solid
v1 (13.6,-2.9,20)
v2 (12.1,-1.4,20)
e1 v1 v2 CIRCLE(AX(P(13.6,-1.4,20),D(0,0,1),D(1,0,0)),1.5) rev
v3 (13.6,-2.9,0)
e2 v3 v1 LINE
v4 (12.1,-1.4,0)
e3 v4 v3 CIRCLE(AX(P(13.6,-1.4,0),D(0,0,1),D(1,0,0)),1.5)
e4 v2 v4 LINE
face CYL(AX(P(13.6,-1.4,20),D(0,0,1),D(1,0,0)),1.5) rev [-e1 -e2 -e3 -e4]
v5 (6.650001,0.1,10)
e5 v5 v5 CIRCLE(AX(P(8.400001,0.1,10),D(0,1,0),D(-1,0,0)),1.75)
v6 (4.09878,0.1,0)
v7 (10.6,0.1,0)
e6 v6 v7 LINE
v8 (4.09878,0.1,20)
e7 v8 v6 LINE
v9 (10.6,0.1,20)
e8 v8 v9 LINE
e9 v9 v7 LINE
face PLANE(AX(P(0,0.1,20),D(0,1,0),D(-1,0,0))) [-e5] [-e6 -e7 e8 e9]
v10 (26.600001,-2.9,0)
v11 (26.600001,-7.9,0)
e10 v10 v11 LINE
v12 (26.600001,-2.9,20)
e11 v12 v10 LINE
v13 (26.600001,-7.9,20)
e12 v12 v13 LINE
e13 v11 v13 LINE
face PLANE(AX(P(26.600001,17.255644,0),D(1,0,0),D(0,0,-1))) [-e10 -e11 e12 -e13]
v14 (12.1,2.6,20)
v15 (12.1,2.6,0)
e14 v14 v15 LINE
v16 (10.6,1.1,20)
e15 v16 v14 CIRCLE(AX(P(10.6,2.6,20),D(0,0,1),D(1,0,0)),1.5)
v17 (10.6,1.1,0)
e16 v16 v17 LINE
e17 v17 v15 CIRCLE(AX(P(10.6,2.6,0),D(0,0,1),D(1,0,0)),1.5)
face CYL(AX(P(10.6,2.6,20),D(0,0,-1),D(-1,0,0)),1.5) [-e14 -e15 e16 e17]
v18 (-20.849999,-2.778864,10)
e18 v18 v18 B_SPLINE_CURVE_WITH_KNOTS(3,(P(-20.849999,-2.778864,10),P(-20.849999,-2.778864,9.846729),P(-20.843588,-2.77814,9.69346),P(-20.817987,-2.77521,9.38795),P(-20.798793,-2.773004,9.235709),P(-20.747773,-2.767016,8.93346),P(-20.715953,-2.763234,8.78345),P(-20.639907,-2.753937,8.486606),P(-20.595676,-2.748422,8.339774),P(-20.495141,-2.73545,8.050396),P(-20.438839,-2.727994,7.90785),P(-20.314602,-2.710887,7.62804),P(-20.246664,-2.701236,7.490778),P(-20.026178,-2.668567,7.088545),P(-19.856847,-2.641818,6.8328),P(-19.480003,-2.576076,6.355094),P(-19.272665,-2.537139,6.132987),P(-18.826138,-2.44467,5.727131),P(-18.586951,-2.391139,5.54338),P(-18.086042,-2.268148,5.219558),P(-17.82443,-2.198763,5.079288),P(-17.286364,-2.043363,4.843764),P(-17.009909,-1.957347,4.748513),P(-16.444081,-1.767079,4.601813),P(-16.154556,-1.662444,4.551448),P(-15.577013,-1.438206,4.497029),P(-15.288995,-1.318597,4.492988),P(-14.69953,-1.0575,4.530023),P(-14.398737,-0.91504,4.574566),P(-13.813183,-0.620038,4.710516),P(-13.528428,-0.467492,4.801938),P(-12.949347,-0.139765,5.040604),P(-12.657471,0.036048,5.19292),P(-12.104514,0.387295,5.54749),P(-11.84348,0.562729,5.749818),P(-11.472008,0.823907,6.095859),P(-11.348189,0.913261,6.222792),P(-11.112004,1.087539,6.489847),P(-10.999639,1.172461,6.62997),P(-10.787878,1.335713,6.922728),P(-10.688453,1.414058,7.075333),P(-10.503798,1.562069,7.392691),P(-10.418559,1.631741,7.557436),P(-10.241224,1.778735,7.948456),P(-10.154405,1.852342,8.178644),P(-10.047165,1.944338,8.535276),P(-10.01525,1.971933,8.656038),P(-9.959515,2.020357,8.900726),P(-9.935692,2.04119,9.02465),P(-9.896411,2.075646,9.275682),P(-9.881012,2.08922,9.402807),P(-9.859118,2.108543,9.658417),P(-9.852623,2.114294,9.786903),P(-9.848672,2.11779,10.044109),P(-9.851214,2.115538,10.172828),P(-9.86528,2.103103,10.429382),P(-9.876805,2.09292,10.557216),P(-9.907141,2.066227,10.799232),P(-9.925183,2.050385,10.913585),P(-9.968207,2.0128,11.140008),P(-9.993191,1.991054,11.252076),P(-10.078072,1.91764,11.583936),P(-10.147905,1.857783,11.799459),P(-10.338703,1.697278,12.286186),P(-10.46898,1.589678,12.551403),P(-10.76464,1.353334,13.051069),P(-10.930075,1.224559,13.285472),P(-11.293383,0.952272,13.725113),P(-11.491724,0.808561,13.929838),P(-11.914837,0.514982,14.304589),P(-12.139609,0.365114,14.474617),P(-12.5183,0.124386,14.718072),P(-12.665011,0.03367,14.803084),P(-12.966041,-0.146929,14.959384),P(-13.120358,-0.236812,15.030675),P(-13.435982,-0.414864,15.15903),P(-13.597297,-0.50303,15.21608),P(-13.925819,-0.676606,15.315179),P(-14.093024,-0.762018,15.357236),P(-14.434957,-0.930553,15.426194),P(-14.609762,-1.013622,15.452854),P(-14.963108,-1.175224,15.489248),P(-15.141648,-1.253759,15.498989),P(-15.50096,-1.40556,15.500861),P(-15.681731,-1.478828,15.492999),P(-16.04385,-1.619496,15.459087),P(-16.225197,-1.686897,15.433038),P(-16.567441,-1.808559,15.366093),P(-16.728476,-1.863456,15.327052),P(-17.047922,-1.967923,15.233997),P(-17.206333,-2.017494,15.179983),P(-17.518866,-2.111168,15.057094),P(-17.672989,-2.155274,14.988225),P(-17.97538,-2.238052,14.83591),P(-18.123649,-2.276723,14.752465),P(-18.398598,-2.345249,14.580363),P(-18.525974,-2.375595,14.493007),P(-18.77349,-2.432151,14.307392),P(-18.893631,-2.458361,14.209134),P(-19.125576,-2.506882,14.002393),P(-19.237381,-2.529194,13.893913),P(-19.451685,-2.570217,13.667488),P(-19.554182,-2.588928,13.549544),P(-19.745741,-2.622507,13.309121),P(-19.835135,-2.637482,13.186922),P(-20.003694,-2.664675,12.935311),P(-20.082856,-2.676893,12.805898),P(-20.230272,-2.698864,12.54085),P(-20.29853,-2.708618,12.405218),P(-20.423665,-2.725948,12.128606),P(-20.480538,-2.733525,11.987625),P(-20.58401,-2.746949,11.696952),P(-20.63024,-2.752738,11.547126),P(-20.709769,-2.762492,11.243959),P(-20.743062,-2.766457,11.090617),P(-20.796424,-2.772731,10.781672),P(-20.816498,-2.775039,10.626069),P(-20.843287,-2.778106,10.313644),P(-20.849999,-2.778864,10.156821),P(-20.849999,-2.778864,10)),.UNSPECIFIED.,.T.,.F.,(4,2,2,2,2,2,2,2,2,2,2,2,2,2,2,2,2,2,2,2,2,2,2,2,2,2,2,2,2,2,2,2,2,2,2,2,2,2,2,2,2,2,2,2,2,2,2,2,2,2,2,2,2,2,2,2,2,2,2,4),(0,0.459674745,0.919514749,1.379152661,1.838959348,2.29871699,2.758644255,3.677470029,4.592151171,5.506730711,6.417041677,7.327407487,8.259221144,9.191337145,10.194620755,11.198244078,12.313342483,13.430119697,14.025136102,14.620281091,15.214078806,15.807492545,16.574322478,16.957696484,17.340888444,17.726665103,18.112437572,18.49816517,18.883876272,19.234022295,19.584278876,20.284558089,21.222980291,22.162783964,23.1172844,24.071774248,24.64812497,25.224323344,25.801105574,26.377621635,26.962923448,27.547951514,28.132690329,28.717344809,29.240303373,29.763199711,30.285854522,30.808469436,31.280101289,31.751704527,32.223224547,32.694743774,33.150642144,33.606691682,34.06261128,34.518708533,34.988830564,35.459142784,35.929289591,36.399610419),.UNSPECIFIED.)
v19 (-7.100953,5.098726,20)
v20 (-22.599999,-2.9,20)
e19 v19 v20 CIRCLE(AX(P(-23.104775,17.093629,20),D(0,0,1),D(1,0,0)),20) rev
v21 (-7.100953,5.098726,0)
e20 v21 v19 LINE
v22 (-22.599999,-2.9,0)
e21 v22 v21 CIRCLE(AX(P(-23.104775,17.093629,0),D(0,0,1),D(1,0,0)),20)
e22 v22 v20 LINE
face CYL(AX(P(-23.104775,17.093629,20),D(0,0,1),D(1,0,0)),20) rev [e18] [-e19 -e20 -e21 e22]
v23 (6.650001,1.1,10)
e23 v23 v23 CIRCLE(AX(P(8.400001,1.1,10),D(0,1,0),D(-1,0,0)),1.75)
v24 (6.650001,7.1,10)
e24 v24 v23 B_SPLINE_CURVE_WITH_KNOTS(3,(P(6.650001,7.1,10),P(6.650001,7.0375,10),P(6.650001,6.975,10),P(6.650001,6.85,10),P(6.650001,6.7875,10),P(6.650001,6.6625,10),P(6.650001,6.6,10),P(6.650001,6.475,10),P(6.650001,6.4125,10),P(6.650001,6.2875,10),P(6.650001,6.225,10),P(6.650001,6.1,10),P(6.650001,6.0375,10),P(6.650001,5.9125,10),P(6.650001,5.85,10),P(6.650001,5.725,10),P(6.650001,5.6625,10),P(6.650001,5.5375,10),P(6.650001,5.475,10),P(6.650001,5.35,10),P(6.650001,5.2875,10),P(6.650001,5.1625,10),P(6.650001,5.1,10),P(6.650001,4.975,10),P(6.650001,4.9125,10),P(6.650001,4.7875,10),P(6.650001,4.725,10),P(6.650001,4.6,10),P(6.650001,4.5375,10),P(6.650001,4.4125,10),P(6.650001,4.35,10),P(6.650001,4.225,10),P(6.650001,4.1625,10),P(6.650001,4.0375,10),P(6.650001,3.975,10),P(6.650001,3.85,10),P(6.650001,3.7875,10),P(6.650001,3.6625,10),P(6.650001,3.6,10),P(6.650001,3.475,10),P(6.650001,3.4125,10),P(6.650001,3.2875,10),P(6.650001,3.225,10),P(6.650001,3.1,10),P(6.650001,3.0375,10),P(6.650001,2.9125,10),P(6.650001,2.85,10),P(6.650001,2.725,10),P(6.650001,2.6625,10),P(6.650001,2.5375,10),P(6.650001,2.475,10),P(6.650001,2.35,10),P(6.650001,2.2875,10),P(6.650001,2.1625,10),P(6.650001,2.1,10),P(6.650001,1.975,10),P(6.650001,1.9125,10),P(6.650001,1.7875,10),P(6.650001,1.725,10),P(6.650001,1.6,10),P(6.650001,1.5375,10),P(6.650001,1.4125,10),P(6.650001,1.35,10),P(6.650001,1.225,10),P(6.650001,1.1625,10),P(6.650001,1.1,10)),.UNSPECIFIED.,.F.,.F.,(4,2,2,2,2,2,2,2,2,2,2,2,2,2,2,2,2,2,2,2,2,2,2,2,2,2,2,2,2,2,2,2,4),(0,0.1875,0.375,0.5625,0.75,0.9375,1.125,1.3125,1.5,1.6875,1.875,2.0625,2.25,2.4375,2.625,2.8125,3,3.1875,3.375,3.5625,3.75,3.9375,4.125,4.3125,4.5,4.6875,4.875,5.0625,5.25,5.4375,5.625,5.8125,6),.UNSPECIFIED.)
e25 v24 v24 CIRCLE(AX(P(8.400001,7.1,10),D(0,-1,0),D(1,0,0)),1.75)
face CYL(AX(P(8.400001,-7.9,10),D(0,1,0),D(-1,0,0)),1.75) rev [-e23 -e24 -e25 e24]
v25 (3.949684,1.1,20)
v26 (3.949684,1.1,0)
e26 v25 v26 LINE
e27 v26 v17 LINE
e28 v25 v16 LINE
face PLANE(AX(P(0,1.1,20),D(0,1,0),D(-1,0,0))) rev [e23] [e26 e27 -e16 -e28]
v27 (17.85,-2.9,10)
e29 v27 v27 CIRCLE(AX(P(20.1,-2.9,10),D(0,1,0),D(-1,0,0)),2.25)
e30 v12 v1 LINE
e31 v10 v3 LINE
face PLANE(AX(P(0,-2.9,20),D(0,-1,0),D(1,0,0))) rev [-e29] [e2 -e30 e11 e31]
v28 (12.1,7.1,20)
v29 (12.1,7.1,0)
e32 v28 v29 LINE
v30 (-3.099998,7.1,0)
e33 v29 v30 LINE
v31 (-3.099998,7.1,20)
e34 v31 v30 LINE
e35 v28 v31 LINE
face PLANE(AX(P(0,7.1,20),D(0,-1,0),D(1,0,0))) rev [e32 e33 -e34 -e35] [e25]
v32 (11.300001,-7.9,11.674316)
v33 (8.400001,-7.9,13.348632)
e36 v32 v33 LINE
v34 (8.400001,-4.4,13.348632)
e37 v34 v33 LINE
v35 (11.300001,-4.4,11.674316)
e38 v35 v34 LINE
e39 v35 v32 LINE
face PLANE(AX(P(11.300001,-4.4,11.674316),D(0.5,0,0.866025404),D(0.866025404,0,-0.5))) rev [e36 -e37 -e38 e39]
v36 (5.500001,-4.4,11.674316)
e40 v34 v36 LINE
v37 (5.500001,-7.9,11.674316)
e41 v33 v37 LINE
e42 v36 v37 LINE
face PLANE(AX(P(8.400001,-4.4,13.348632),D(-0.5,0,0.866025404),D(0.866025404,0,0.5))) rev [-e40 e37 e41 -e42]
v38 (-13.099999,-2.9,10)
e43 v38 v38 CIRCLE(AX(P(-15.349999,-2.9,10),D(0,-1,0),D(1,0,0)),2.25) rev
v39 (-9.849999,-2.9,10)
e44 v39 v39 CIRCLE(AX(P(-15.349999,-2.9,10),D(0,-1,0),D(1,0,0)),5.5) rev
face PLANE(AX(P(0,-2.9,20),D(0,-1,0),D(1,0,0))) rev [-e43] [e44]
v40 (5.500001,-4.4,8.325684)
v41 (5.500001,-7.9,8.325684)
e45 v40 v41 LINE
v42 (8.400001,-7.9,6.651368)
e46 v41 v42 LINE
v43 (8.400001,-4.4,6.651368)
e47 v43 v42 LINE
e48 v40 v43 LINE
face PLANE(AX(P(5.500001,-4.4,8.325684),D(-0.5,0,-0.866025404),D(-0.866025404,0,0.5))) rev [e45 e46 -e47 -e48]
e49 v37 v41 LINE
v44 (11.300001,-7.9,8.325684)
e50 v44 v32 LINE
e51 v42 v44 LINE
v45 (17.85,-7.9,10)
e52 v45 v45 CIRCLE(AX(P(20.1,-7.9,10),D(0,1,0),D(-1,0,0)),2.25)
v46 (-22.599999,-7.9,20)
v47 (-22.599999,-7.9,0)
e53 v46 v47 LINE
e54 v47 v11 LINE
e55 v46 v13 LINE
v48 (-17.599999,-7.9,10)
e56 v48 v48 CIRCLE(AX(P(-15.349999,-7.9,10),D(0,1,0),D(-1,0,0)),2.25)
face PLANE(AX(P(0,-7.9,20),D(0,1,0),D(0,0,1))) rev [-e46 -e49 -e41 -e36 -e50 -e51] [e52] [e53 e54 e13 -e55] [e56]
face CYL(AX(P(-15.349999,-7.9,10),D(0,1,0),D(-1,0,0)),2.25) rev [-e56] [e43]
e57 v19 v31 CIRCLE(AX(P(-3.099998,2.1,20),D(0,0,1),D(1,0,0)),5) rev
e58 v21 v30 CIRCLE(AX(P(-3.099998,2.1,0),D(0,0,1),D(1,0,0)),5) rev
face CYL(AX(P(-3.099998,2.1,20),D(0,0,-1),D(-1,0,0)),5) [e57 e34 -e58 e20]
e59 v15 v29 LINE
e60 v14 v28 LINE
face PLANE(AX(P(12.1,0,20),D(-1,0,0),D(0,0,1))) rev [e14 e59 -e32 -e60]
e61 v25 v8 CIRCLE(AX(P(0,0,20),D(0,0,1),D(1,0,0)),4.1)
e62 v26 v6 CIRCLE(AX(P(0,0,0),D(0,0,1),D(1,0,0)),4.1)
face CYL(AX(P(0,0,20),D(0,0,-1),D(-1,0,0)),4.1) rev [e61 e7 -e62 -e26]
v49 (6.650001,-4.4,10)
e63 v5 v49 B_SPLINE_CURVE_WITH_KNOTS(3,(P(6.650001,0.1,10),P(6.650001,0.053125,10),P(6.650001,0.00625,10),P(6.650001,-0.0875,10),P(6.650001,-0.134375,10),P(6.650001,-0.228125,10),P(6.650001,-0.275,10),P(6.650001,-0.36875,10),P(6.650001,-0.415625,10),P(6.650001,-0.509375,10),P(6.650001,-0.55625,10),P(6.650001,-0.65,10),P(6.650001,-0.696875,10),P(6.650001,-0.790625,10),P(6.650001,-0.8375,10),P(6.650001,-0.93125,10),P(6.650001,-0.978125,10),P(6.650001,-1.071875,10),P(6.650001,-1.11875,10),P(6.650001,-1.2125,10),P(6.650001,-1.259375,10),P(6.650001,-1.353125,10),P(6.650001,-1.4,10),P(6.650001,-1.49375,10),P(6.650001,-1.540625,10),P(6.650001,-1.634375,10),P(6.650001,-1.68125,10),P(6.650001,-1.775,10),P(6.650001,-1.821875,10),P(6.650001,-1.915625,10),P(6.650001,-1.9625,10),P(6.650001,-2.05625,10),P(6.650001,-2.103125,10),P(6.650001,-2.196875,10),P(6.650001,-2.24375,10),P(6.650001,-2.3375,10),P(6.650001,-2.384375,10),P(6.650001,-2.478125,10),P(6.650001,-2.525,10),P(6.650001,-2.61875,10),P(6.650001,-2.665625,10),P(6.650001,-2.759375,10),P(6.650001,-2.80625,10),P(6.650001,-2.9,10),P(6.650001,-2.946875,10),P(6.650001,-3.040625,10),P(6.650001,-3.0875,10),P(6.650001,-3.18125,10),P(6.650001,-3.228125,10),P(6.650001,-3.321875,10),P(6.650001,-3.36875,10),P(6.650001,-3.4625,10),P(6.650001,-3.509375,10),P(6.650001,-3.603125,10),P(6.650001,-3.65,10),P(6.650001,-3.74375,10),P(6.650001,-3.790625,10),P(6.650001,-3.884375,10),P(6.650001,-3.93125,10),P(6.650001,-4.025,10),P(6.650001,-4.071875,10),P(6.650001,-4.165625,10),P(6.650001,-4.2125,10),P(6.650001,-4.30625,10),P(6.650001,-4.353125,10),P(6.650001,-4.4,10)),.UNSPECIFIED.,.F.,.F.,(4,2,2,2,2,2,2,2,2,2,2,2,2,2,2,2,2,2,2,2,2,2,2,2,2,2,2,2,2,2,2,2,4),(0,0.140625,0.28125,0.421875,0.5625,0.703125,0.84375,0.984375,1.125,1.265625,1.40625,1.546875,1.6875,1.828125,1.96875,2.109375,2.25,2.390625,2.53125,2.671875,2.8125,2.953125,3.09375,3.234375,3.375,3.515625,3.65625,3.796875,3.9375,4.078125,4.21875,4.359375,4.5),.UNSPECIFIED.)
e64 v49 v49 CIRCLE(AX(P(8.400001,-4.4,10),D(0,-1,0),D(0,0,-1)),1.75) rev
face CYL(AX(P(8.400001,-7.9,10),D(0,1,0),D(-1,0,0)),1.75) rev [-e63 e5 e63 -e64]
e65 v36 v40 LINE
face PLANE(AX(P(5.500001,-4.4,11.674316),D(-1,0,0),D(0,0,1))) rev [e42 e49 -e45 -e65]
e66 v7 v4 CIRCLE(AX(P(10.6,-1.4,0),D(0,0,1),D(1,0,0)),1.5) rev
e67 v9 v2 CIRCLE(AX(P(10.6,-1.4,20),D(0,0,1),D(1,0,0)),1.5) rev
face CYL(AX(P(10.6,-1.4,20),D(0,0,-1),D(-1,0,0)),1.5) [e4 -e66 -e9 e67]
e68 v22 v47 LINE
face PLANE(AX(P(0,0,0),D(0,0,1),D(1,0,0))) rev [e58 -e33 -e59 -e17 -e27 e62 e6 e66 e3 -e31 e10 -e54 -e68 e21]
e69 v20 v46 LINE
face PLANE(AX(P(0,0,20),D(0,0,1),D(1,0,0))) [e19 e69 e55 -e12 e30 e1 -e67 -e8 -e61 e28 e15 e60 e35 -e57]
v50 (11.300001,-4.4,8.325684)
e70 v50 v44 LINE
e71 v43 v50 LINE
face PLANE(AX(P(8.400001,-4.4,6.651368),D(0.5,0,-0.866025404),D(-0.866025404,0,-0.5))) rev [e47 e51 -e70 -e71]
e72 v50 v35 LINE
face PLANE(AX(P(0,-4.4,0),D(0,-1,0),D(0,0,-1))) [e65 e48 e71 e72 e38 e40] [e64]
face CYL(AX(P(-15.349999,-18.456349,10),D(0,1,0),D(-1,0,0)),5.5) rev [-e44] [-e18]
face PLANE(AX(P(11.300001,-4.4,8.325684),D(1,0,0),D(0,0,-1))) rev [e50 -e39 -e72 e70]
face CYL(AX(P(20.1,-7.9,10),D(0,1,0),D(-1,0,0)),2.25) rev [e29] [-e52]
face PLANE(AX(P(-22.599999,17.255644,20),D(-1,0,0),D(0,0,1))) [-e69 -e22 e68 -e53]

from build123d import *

# Parameters (mm, degrees)
RESSALTO_EXTRUS_O1_DEPTH   = 20
CORTE_EXTRUS_O1_DEPTH      = 35.724775606
CORTE_EXTRUS_O1_DEPTH_BACK = 35.724775606
ESBO_O2_R                  = 1.75
CORTE_EXTRUS_O2_DEPTH      = 3.5
FILETE1_R                  = 1.5
ESBO_O4_W                  = 2.5
ESBO_O4_H                  = 20
RESSALTO_EXTRUS_O2_DEPTH   = 5
ESBO_O5_R                  = 2.25
CORTE_EXTRUS_O3_DEPTH      = 35.749964678
FILETE2_DEPTH              = 7.7499999
FILETE2_START              = 12.2500001
FILETE2_2_DEPTH            = 7.7499999
FILETE2_START_2            = 7.7499999
FILETE2_3_DEPTH            = 4.5000002
FILETE2_START_3            = -2.9
FILETE2_4_OUTLINE_R        = 2.25
FILETE2_4_DEPTH            = 7.998725805
ESBO_O6_R                  = 5.5
CORTE_EXTRUS_O4_DEPTH      = 10


with BuildPart() as part:
    # Esboço1 → Ressalto-extrusão1 (new body)
    with BuildSketch(Plane.XY):
        with BuildLine():
            ThreePointArc((10.599999813, 0.1), (11.660659985, -0.339339828), (12.099999813, -1.4))
            Line((12.099999813, -1.4), (12.099999813, -2.9))
            Line((12.099999813, -2.9), (24.100000848, -2.9))
            Line((24.100000848, -2.9), (24.100000848, -7.9))
            Line((24.100000848, -7.9), (-20.099999152, -7.9))
            Line((-20.099999152, -7.9), (-20.099999152, -2.9))
            Line((-20.099999152, -2.9), (-8.099998116, -2.9))
            Line((-8.099998116, -2.9), (-8.099998116, 2.1))
            ThreePointArc((-8.099998116, 2.1), (-6.635532022, 5.635533906), (-3.099998116, 7.1))
            Line((-3.099998116, 7.1), (12.099999813, 7.1))
            Line((12.099999813, 7.1), (12.099999813, 2.6))
            ThreePointArc((12.099999813, 2.6), (11.660659985, 1.539339828), (10.599999813, 1.1))
            Line((10.599999813, 1.1), (3.949683532, 1.1))
            ThreePointArc((3.949683532, 1.1), (-4.055174785, -0.604613482), (4.098780306, 0.1))
            Line((4.098780306, 0.1), (10.599999813, 0.1))
        make_face()
    extrude(amount=RESSALTO_EXTRUS_O1_DEPTH)

    # Esboço2 → Corte-extrusão1 (cut, two sides: drawn at the far end of the back side and taken through both)
    with BuildSketch(Plane(origin=(0, 7.1, 0), x_dir=(1, 0, 0), z_dir=(0, 1, 0)).offset(-CORTE_EXTRUS_O1_DEPTH_BACK)):
        with Locations(Location((8.400001366, -10, 0), (0, 0, 180))):
            Circle(ESBO_O2_R)
    extrude(amount=CORTE_EXTRUS_O1_DEPTH + CORTE_EXTRUS_O1_DEPTH_BACK, mode=Mode.SUBTRACT)

    # Esboço3 → Corte-extrusão2 (cut)
    with BuildSketch(Plane.XZ.offset(7.9)):
        Polygon((8.400001366, 13.348631561), (5.500001366, 11.674315781), (5.500001366, 8.325684219), (8.400001366, 6.651368439), (11.300001366, 8.325684219), (11.300001366, 11.674315781), align=None)
    extrude(amount=-CORTE_EXTRUS_O2_DEPTH, mode=Mode.SUBTRACT)

    # Filete1
    filete1_edges = [part.edges().sort_by_distance(p)[0] for p in [
        (12.099999813, -2.9, 10),
    ]]
    fillet(filete1_edges, radius=FILETE1_R - 0.0001)  # a hair under: the kernel refuses the full size

    # Esboço4 → Ressalto-extrusão2 (add)
    with BuildSketch(Plane.XZ.offset(7.9)):
        with Locations((-21.349999152, 10)):
            Rectangle(ESBO_O4_W, ESBO_O4_H)
        with Locations((25.350000848, 10)):
            Rectangle(ESBO_O4_W, ESBO_O4_H)
    extrude(amount=-RESSALTO_EXTRUS_O2_DEPTH)

    # Esboço5 → Corte-extrusão3 (cut, through all)
    with BuildSketch(Plane(origin=(0, -2.9, 0), x_dir=(1, 0, 0), z_dir=(0, 1, 0))):
        with Locations(Location((-15.349998634, -10, 0), (0, 0, 180))):
            Circle(ESBO_O5_R)
        with Locations(Location((20.100000331, -10, 0), (0, 0, 180))):
            Circle(ESBO_O5_R)
    extrude(amount=-CORTE_EXTRUS_O3_DEPTH, mode=Mode.SUBTRACT)

    # Filete2: read off the stored shape, not the designer's step
    # Filete2 outline → Filete2 (add)
    with BuildSketch(Plane.XY):
        with BuildLine():
            ThreePointArc((-7.100953445, 5.098725805), (-13.932624155, -0.679149409), (-22.599999152, -2.9))
            Line((-22.599999152, -2.9), (-8.099998116, -2.9))
            Line((-8.099998116, -2.9), (-8.099998116, 2.1))
            ThreePointArc((-8.099998116, 2.1), (-7.843666351, 3.680383396), (-7.100953445, 5.098725805))
        make_face()
    extrude(amount=FILETE2_DEPTH)

    # Filete2 2 outline → Filete2 2 (add)
    with BuildSketch(Plane.XY.offset(FILETE2_START)):
        with BuildLine():
            ThreePointArc((-7.100953445, 5.098725805), (-13.932624155, -0.679149409), (-22.599999152, -2.9))
            Line((-22.599999152, -2.9), (-8.099998116, -2.9))
            Line((-8.099998116, -2.9), (-8.099998116, 2.1))
            ThreePointArc((-8.099998116, 2.1), (-7.843666351, 3.680383396), (-7.100953445, 5.098725805))
        make_face()
    extrude(amount=FILETE2_2_DEPTH)

    # Filete2 3 outline → Filete2 3 (add)
    with BuildSketch(Plane.XY.offset(FILETE2_START_2)):
        with BuildLine():
            ThreePointArc((-7.100953445, 5.098725805), (-13.932624155, -0.679149409), (-22.599999152, -2.9))
            Line((-22.599999152, -2.9), (-8.099998116, -2.9))
            Line((-8.099998116, -2.9), (-8.099998116, 2.099999998))
            ThreePointArc((-8.099998116, 2.099999998), (-7.843666351, 3.680383395), (-7.100953445, 5.098725805))
        make_face()
    extrude(amount=FILETE2_3_DEPTH)

    # Filete2 4 outline → Filete2 4 (cut)
    with BuildSketch(Plane(origin=(0, 0, 0), x_dir=(1, 0, 0), z_dir=(0, 1, 0)).offset(FILETE2_START_3)):
        with Locations((-15.349998634, -10)):
            Circle(FILETE2_4_OUTLINE_R)
    extrude(amount=FILETE2_4_DEPTH, mode=Mode.SUBTRACT)

    # Esboço6 → Corte-extrusão4 (cut)
    with BuildSketch(Plane(origin=(0, 7.1, 0), x_dir=(1, 0, 0), z_dir=(0, 1, 0))):
        with Locations(Location((-15.349998634, -10, 0), (0, 0, 180))):
            Circle(ESBO_O6_R)
    extrude(amount=-CORTE_EXTRUS_O4_DEPTH, mode=Mode.SUBTRACT)


solid = part.part
